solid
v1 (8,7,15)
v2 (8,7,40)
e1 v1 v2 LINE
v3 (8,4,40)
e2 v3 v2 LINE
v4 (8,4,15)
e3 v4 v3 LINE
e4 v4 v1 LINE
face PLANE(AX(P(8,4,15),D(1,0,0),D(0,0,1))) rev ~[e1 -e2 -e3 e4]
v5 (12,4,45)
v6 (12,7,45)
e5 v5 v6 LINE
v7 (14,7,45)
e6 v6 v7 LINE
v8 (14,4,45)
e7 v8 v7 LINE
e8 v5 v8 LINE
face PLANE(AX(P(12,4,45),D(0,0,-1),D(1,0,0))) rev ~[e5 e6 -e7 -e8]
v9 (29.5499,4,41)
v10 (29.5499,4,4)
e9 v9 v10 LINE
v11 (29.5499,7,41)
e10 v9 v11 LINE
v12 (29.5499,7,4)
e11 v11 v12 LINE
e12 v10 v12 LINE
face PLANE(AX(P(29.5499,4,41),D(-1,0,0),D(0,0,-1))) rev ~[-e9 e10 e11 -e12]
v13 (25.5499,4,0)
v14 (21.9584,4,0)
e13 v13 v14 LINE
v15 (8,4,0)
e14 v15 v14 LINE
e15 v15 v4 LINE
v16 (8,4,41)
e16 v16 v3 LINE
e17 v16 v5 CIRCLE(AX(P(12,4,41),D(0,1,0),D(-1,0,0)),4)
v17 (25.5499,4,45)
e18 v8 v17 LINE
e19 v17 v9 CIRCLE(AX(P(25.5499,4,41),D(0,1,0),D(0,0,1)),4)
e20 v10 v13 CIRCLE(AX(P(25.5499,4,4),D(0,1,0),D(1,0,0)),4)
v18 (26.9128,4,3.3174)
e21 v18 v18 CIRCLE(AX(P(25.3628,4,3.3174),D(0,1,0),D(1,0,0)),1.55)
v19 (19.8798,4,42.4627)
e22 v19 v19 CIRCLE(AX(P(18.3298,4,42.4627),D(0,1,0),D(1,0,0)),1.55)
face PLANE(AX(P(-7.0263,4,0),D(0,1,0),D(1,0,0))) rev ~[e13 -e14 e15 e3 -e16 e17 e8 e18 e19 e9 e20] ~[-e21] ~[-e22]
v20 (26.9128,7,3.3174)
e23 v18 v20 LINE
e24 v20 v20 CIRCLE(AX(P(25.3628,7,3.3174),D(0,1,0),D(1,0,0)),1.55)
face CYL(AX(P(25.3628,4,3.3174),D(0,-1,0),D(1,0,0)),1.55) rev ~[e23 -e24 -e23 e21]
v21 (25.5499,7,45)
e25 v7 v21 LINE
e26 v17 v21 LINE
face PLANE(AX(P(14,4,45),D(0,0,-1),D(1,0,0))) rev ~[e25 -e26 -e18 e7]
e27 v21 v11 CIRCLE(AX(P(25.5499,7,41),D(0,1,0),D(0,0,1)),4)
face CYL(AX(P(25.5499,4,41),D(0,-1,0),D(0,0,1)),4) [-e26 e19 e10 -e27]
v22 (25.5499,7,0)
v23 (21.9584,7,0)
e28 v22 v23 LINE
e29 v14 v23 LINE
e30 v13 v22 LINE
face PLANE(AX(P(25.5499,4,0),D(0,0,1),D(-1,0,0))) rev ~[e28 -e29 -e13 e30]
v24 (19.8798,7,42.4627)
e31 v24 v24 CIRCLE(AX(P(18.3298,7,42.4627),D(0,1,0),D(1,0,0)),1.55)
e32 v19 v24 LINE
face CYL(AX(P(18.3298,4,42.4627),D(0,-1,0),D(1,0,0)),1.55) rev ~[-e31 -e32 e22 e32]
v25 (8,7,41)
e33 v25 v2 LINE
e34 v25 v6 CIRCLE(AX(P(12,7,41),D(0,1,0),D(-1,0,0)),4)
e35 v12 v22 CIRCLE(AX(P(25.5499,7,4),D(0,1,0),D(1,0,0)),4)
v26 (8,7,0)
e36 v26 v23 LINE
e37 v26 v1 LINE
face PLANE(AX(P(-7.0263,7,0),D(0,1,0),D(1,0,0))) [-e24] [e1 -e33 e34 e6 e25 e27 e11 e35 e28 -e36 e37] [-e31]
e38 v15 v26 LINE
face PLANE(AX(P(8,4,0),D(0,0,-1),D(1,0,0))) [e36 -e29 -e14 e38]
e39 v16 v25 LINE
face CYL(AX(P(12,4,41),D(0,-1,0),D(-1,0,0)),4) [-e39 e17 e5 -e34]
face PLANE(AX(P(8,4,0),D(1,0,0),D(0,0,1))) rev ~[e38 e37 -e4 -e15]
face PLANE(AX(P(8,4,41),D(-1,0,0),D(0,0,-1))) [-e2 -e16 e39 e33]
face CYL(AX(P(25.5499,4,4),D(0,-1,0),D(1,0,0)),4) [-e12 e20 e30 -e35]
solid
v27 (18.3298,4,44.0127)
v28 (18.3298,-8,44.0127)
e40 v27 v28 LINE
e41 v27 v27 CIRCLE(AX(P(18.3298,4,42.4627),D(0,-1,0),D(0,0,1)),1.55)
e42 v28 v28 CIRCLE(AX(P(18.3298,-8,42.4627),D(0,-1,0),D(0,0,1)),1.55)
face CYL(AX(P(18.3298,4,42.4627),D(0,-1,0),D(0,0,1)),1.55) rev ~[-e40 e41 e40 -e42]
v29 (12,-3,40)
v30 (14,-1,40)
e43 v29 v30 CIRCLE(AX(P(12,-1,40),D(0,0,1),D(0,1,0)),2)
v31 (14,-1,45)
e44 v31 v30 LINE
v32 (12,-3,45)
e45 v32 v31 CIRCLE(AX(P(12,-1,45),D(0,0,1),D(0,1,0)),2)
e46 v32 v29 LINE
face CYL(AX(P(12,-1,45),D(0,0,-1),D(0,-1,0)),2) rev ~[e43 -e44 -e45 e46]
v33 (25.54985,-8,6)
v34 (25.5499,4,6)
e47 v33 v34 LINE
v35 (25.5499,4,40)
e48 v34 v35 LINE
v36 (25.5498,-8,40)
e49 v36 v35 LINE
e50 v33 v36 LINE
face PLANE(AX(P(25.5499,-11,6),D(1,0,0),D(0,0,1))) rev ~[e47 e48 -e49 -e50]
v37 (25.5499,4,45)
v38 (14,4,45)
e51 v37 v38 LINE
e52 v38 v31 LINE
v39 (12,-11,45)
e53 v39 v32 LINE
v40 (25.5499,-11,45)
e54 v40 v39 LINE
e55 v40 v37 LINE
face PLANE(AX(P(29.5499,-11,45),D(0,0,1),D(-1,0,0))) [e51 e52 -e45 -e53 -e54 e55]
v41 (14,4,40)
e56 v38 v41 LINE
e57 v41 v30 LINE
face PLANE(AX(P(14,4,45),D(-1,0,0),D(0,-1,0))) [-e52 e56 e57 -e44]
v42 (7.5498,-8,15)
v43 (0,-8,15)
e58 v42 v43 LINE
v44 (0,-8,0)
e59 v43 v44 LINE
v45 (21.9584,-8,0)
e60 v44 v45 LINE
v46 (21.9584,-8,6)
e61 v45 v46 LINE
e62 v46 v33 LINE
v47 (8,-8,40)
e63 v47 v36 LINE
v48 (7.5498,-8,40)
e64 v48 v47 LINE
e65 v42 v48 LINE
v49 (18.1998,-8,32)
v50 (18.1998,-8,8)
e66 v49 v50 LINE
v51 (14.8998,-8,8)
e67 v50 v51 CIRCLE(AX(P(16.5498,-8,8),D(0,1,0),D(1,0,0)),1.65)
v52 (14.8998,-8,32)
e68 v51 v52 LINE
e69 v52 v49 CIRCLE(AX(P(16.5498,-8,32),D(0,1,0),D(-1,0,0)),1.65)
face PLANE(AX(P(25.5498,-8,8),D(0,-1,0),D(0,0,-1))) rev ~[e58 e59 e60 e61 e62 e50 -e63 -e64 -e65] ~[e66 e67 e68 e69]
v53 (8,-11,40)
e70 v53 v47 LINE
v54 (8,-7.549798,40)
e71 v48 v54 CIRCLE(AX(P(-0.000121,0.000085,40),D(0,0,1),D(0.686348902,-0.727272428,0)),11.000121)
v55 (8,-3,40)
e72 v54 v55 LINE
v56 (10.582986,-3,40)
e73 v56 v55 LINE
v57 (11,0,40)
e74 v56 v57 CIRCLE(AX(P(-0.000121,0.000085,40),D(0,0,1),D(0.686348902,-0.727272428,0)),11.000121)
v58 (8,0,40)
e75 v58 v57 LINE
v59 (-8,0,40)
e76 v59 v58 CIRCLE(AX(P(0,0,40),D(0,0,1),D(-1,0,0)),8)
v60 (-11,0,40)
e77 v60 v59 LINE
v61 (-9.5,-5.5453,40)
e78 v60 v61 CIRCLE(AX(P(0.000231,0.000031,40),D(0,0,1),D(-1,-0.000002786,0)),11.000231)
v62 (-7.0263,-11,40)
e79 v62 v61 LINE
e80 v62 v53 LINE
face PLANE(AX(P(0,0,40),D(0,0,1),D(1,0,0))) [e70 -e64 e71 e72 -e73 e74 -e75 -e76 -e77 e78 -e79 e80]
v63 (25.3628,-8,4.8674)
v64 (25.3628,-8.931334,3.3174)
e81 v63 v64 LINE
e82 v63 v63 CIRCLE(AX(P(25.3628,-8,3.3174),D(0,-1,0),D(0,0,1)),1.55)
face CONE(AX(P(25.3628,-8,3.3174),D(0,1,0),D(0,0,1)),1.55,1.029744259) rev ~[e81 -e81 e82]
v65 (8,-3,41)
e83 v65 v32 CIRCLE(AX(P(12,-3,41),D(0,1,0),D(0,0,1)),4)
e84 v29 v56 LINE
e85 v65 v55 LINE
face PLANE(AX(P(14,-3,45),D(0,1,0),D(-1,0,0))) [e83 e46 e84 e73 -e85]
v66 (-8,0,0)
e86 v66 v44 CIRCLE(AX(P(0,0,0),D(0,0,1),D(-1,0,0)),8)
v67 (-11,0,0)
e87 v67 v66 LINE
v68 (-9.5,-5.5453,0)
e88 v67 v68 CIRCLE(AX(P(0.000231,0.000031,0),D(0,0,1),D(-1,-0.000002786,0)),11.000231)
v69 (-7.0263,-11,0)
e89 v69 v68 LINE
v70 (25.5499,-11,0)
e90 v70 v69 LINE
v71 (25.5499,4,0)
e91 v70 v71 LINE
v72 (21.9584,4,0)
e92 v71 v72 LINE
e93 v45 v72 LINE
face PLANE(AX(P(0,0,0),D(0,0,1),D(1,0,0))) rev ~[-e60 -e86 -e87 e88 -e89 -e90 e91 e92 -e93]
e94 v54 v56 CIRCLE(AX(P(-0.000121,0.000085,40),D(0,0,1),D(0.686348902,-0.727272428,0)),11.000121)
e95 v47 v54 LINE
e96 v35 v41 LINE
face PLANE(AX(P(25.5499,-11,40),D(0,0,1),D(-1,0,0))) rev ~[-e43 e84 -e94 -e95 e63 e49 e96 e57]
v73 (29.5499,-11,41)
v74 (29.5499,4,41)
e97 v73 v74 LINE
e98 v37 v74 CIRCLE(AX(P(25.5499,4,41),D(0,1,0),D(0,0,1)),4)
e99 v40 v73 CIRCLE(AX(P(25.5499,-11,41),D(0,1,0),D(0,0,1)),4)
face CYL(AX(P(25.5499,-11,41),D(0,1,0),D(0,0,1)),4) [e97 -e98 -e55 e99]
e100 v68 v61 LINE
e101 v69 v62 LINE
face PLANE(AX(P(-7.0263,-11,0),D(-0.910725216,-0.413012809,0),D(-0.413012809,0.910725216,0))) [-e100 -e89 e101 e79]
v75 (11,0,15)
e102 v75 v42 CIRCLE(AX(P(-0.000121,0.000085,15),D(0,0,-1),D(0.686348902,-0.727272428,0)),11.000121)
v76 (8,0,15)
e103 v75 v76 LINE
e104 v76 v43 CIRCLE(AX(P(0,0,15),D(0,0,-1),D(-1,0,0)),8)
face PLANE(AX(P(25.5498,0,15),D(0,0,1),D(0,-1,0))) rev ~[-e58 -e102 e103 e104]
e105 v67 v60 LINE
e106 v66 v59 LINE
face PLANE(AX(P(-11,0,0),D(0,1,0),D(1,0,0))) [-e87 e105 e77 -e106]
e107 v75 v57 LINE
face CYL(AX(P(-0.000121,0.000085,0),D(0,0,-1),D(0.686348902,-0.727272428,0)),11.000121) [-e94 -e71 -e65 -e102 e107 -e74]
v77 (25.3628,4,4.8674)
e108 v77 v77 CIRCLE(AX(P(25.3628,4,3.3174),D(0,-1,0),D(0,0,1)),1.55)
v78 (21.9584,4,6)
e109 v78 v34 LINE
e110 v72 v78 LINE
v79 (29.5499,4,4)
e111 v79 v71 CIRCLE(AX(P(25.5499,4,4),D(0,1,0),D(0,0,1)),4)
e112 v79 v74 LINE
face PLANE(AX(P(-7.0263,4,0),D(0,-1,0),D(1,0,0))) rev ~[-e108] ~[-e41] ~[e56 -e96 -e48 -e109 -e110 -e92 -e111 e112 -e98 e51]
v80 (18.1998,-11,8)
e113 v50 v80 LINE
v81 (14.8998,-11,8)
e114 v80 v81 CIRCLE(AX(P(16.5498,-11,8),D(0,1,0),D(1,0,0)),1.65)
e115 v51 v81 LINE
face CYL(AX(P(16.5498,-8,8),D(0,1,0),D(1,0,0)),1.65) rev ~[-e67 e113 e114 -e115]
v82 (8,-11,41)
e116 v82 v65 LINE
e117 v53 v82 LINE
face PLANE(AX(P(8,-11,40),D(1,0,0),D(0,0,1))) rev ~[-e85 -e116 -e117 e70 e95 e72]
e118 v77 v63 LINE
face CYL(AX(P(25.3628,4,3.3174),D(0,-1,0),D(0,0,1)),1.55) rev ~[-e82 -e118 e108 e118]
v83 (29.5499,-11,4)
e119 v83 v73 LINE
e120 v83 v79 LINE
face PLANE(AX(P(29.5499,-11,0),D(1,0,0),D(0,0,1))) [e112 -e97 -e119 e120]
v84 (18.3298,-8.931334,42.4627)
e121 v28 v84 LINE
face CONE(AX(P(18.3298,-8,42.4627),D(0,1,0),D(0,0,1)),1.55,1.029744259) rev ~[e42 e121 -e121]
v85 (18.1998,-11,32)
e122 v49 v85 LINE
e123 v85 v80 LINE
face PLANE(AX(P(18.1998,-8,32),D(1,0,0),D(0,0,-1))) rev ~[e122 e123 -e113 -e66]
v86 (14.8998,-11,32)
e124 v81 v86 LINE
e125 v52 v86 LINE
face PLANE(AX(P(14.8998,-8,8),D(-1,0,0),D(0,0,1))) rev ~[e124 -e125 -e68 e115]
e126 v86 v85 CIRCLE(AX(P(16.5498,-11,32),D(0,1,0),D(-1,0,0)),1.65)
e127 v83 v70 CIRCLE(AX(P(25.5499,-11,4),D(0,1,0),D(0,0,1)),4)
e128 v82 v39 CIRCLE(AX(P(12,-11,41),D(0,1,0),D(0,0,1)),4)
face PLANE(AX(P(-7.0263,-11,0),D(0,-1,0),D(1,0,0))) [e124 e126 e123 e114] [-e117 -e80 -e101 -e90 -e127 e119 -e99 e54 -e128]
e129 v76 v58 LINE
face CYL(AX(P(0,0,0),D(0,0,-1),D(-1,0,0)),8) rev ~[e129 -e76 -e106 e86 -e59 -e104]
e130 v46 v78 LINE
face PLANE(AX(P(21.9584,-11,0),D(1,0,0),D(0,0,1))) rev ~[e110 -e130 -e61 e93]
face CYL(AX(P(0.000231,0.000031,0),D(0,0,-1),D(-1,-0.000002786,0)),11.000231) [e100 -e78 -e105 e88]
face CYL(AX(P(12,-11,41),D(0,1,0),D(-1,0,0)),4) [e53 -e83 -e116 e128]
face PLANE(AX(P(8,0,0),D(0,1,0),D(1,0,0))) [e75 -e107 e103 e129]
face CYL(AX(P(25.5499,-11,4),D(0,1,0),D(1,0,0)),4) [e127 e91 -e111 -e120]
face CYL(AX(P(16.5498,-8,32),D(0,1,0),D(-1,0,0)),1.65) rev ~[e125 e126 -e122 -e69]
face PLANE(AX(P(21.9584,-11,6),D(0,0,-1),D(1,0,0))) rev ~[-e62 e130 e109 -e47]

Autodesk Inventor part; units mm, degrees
ref_plane "YZ Plane" through (0, 0, 0) normal (1, 0, 0) x (0, 1, 0)
ref_plane "XZ Plane" through (0, 0, 0) normal (0, 1, 0) x (-1, 0, 0)
sketch "Sketch4" plane through (0, 0, 0) normal (0, 0, 1) x (1, 0, 0)
  arc A0 (-8, 0) -> (8, 0) centre (0, 0) ccw
  line L0 (-11, 0) -> (-8, 0)
  line L1 (7.5498, -8) -> (25.5498, -8)
  line L2 (25.5498, -8) -> (25.5498, -11)
  arc A1 (-11, 0) -> (-9.5, -5.5453) centre (0, 0) ccw
  arc A2 (7.5498, -8) -> (11, 0) centre (0, 0) ccw
  line L3 (8, 0) -> (11, 0)
  line L4 (-7.0263, -11) -> (-9.5, -5.5453)
  line L5 (-7.0263, -11) -> (25.5498, -11)
  dimension "d0" = 16
  dimension "d14" = 18
  dimension "d15" = 3
  dimension "d20" = 3
extrude "Extrusion1" add sketch "Sketch4" along normal blind 40
sketch "Sketch5" plane through (7.5498, -8, 0) normal (0, 1, 0) x (1, 0, 0)
  line L0 (0, 0) -> (18, 0) projected
  line L1 (0, 0) -> (0, -40) projected
  line L2 (18, -40) -> (0, -40) projected
  line L3 (18, 0) -> (18, -40) projected
  line L4 (9, -32) -> (9, -8) construction
  line L5 (10.65, -32) -> (10.65, -8)
  line L6 (7.35, -8) -> (7.35, -32)
  arc A0 (7.35, -32) -> (10.65, -32) centre (9, -32) ccw
  arc A1 (10.65, -8) -> (7.35, -8) centre (9, -8) ccw
  point P0 (-7.5498, 0)
  point P1 (9, -20)
  point P2 (18, -20)
  dimension "d5" = 9
  dimension "d16" = 12
  dimension "d17" = 3.3
extrude "Extrusion2" cut sketch "Sketch5" against normal through all contours A0 L6 A1 L5
ref_plane "Work Plane1" through (25.5498, -11, 8) normal (1, 0, 0) x (0, 0, -1)
sketch "Sketch7" plane through (25.5498, -11, 8) normal (1, 0, 0) x (0, 0, -1)
  line L0 (0, 3) -> (8, 3)
  line L1 (8, 11) -> (-7, 11)
  line L2 (-7, 11) -> (-7, 3)
  line L3 (-7, 3) -> (8, 3)
  line L4 (8, 3) -> (8, 11)
  dimension "d22" = 15
extrude "Extrusion3" cut sketch "Sketch7" against normal up to surface
sketch "Sketch8" plane through (-7.0263, -11, 0) normal (0, -1, 0) x (1, 0, 0)
  line L0 (32.5762, 0) -> (32.5762, 40) construction
  line L1 (32.5762, 40) -> (14.5762, 40) projected
  line L2 (36.5762, 0) -> (36.5762, 45)
  line L3 (36.5762, 45) -> (15.0263, 45)
  line L4 (36.5762, 0) -> (28.9847, 0)
  line L5 (28.9847, 0) -> (28.9847, 6)
  line L6 (28.9847, 6) -> (32.5762, 6)
  line L7 (32.5762, 6) -> (32.5762, 40)
  line L8 (15.0263, 15) -> (15.0263, 40) projected
  line L9 (15.0263, 40) -> (15.0263, 45)
  point P0 (7.0263, 0)
  dimension "d25" = 4
  dimension "d26" = 6
  dimension "d27" = 5
extrude "Extrusion4" add sketch "Sketch8" against normal blind 15
sketch "Sketch9" plane through (8, -11, 45) normal (0, 0, 1) x (1, 0, 0)
  line L0 (0, 15) -> (21.5498, 15) projected
  line L1 (0, 0) -> (0, 15) projected
  line L2 (0, 15) -> (6, 15)
  line L3 (6, 15) -> (6, 8)
  line L4 (6, 8) -> (0, 8)
  line L5 (0, 8) -> (0, 15)
  point P0 (-8, 11)
  dimension "d30" = 6
  dimension "d31" = 7
extrude "Extrusion5" cut sketch "Sketch9" against normal up to surface (5 mm away)
fillet "Fillet2" radius 2 1 edges at (14, -3, 42.5)
fillet "Fillet3" radius 4 3 edges at (29.5498, -3.5, 45) (29.5498, -3.5, 0) (8, -7, 45)
sketch "Sketch10" plane through (-7.0263, 4, 0) normal (0, 1, 0) x (1, 0, 0)
  line L0 (28.9847, 0) -> (28.9847, -6) projected
  line L1 (21.0263, -40) -> (21.0263, -45) projected
  point P0 (7.0263, 0)
  point P1 (32.3891, -3.3174)
  point P2 (25.3561, -42.4627)
hole "Hole2" at (25.3628, 4, 3.3174) at (18.3298, 4, 42.4627) direction (0, -1, 0) diameter 3.1 depth 12 tip angle 118
sketch "Sketch11" plane through (-7.0263, 4, 0) normal (0, 1, 0) x (1, 0, 0)
  line L0 (36.5762, -41) -> (36.5762, -4) projected
  arc A0 (32.5762, -45) -> (36.5762, -41) centre (32.5762, -41) ccw projected
  line L1 (21.0263, -45) -> (32.5762, -45) projected
  arc A1 (36.5762, -4) -> (32.5762, 0) centre (32.5762, -4) ccw projected
  line L2 (32.5762, 0) -> (28.9847, 0) projected
  line L3 (15.0263, -15) -> (15.0263, -40) projected
  line L4 (15.0263, 0) -> (28.9847, 0)
  arc A2 (15.0263, -41) -> (19.0263, -45) centre (19.0263, -41) ccw projected
  line L5 (15.0263, -41) -> (15.0263, -40) projected
  line L6 (19.0263, -45) -> (21.0263, -45) projected
  line L7 (15.0263, 0) -> (15.0263, -15)
  circle A3 centre (32.3891, -3.3174) radius 1.55 projected
  circle A4 centre (25.3561, -42.4627) radius 1.55 projected
  point P0 (7.0263, 0)
extrude "Extrusion6" add sketch "Sketch11" along normal blind 3 separate body
properties part number "br"
